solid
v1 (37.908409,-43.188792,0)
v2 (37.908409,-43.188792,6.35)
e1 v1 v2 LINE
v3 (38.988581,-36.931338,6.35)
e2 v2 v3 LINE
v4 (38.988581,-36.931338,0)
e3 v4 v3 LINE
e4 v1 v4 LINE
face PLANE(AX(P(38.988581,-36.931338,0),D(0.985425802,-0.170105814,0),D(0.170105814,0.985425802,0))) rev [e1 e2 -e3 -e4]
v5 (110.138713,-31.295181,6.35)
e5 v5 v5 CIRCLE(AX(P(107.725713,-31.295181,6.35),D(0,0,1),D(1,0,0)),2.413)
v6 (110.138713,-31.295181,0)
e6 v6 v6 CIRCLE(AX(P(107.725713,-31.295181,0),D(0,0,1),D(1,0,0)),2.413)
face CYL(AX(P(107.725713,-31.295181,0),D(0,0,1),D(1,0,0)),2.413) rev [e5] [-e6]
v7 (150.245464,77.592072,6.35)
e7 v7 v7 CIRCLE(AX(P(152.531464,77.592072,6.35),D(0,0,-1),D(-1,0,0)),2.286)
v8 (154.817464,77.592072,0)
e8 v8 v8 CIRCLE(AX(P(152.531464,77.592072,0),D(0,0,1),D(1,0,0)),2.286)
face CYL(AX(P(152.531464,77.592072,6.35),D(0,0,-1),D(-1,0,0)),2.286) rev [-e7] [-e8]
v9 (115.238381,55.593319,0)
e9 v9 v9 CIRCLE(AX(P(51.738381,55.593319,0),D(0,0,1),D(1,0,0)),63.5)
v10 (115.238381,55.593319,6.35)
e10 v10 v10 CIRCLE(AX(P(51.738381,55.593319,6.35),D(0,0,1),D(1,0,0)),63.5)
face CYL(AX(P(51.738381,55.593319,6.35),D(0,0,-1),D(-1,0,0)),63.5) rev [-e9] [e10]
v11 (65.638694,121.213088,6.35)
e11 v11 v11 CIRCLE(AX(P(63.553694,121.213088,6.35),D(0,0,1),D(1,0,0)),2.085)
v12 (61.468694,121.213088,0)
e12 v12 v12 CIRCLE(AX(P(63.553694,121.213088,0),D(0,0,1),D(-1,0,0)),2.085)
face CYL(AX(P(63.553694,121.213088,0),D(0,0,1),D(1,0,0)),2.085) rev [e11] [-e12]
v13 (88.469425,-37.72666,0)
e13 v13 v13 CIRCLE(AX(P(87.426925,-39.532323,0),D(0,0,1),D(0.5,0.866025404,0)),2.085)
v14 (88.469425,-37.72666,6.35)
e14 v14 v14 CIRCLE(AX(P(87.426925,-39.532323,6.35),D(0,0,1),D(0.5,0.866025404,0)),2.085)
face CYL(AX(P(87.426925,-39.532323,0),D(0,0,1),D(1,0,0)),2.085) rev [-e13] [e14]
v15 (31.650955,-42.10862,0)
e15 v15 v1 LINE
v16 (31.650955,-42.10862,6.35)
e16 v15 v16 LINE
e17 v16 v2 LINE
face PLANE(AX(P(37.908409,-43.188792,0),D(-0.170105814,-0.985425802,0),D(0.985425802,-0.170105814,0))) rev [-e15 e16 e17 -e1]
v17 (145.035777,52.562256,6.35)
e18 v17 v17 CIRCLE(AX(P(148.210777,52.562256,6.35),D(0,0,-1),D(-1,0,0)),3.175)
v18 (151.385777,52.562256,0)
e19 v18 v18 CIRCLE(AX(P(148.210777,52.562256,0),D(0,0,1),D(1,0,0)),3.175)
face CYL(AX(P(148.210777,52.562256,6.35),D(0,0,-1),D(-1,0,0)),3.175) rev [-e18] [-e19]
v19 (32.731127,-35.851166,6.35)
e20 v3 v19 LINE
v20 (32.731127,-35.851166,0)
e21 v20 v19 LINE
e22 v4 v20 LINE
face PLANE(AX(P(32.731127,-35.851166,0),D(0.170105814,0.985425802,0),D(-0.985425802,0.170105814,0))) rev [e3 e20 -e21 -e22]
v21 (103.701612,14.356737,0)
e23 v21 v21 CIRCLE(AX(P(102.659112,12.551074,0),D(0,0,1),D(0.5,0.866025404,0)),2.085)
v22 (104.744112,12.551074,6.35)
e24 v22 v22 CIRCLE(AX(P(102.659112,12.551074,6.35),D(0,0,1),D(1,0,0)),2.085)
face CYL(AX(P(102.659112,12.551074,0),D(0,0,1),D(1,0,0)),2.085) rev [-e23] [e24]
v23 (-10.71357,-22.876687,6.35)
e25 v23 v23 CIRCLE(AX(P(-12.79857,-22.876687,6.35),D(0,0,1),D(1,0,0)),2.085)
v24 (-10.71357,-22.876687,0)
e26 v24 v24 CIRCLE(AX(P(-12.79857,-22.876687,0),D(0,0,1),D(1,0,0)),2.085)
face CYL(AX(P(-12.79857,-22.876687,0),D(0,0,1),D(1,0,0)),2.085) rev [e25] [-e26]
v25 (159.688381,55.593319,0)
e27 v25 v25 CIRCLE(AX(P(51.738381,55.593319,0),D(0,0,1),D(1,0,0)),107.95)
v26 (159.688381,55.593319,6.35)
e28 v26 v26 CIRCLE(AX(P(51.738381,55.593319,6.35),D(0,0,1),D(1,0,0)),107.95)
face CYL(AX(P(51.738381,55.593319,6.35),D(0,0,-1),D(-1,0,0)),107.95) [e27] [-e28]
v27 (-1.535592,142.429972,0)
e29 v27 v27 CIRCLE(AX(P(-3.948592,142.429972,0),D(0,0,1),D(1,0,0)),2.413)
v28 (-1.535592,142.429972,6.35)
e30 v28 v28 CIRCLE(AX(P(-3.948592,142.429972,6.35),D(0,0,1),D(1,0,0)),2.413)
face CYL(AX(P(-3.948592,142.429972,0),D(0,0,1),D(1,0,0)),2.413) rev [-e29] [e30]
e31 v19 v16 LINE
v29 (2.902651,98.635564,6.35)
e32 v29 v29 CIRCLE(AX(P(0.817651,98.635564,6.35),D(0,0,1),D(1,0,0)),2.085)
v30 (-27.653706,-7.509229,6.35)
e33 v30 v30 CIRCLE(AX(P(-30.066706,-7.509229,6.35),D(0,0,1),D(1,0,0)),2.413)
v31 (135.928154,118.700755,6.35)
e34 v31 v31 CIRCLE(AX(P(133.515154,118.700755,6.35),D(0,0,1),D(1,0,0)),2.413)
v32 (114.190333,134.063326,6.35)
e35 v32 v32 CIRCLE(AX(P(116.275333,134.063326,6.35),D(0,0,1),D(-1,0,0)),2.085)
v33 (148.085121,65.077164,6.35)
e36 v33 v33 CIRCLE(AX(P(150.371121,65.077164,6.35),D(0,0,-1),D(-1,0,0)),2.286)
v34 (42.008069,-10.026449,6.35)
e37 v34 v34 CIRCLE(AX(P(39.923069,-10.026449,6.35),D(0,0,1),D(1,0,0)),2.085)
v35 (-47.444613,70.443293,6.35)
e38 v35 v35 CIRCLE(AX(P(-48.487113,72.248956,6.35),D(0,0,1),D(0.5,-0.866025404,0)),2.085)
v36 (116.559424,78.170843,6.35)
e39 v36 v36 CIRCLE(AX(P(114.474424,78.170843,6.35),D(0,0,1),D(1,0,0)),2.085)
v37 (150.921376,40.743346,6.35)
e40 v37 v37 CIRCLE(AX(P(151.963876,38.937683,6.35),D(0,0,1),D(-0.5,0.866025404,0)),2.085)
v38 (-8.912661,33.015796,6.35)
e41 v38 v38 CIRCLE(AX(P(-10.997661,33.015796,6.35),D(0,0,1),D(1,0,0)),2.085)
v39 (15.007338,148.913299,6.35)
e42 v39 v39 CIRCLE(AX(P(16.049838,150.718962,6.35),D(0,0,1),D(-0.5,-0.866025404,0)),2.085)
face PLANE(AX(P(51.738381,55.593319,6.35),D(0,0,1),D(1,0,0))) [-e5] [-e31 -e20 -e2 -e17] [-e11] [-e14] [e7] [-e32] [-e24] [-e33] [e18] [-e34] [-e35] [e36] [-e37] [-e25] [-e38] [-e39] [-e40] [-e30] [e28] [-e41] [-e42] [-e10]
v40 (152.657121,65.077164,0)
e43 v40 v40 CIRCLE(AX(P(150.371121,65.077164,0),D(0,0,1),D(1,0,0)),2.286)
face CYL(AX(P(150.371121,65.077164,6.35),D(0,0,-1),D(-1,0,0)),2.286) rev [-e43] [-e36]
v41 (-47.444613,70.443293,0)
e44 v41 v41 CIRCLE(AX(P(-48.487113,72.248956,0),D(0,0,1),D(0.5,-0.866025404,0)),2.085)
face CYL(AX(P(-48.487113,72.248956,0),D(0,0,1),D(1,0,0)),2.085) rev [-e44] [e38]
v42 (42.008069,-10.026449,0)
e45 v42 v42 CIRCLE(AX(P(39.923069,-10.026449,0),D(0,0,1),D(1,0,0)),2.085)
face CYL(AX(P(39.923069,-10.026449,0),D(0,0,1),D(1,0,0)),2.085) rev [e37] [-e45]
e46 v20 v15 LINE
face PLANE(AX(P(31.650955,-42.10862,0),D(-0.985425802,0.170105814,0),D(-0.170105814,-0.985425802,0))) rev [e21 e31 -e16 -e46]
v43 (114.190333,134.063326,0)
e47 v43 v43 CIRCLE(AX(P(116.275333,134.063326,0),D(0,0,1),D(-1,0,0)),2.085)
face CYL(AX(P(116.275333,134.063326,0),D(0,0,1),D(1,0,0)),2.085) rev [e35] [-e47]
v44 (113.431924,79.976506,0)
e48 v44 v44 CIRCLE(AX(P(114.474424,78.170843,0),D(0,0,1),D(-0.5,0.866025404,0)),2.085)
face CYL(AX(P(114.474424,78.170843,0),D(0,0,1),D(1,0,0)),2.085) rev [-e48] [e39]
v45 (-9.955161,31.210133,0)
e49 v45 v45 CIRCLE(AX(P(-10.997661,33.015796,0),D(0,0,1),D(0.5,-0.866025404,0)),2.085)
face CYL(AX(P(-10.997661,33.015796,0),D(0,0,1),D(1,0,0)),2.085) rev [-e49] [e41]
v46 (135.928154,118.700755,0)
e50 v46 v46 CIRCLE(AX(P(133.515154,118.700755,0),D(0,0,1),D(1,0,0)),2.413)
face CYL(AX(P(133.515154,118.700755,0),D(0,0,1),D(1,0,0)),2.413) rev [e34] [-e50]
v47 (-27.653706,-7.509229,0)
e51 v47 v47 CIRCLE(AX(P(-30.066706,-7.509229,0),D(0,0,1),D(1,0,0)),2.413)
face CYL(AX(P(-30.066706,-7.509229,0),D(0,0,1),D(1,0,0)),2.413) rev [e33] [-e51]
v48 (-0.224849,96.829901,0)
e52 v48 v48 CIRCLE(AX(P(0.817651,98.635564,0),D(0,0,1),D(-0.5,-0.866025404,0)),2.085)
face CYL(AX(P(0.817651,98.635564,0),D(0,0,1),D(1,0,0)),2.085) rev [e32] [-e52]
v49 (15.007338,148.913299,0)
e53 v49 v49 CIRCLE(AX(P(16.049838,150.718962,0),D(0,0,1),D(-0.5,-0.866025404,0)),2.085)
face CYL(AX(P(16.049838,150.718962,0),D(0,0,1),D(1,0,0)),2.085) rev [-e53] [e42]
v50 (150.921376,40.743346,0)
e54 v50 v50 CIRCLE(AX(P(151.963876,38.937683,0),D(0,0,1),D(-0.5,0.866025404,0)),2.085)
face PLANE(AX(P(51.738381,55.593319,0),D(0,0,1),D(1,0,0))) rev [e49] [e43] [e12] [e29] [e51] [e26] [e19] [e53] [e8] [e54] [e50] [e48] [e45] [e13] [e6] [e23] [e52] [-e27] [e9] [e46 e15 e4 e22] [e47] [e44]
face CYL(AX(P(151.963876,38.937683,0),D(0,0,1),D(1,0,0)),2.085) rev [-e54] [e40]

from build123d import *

# Parameters (mm, degrees)
SKETCH1_R                 = 107.95
SKETCH1_R_2               = 63.5
BOSS_EXTRUDE1_DEPTH       = 6.35
SKETCH3_R                 = 2.085
CUT_EXTRUDE2_DEPTH        = 229.663768434
CIRPATTERN1_COUNT         = 6
SKETCH4_R                 = 2.085
CUT_EXTRUDE3_DEPTH        = 229.663768434
CIRPATTERN2_COUNT         = 6
SKETCH5_R                 = 2.413
CUT_EXTRUDE4_DEPTH        = 229.663768434
CUT_EXTRUDE7_DEPTH        = 229.663768434
CUT_EXTRUDE7_DEPTH_BACK   = 229.663768434
SKETCH9_R                 = 2.413
CUT_EXTRUDE8_DEPTH        = 229.663768434
CUT_EXTRUDE10_START       = -6.35
CUT_EXTRUDE10_OUTLINE_R   = 3.175
CUT_EXTRUDE10_OUTLINE_R_2 = 2.286
CUT_EXTRUDE10_DEPTH       = 6.35


# Read off the part's stored shape, not the designer's step: Cut-Extrude10
with BuildPart() as part:
    # Sketch1 → Boss-Extrude1 (new body)
    with BuildSketch(Plane.XY):
        with Locations((51.738381467, 55.593319394)):
            Circle(SKETCH1_R)
        with Locations((51.738381467, 55.593319394)):
            Circle(SKETCH1_R_2, mode=Mode.SUBTRACT)
    extrude(amount=BOSS_EXTRUDE1_DEPTH)

    # Sketch3 → Cut-Extrude2 (cut, through all)
    with BuildSketch(Plane.XY.offset(6.35)):
        with Locations((-12.798570104, -22.876686862)):
            Circle(SKETCH3_R)
    cut_extrude2 = extrude(amount=-CUT_EXTRUDE2_DEPTH, mode=Mode.SUBTRACT)

    # CirPattern1: Cut-Extrude2 ×6 about axis
    cirpattern1_axis = Axis((51.738381467, 55.593319394, 0), (0, 0, 1))
    for i in range(1, CIRPATTERN1_COUNT):
        add(cut_extrude2.rotate(cirpattern1_axis, i * 360 / CIRPATTERN1_COUNT), mode=Mode.SUBTRACT)

    # Sketch4 → Cut-Extrude3 (cut, symmetric)
    with BuildSketch(Plane.XY.offset(6.35)):
        with Locations((39.923069121, -10.026449115)):
            Circle(SKETCH4_R)
    cut_extrude3 = extrude(amount=CUT_EXTRUDE3_DEPTH, both=True, mode=Mode.SUBTRACT)

    # CirPattern2: Cut-Extrude3 ×6 about axis
    cirpattern2_axis = Axis((51.738381467, 55.593319394, 0), (0, 0, 1))
    for i in range(1, CIRPATTERN2_COUNT):
        add(cut_extrude3.rotate(cirpattern2_axis, i * 360 / CIRPATTERN2_COUNT), mode=Mode.SUBTRACT)

    # Sketch5 → Cut-Extrude4 (cut, through all)
    with BuildSketch(Plane.XY.offset(6.35)):
        with Locations((-30.066706461, -7.50922857)):
            Circle(SKETCH5_R)
        with Locations((107.725712792, -31.295181319)):
            Circle(SKETCH5_R)
    extrude(amount=-CUT_EXTRUDE4_DEPTH, mode=Mode.SUBTRACT)

    # Sketch8 → Cut-Extrude7 (cut, two sides: drawn at the far end of the back side and taken through both)
    with BuildSketch(Plane.XY.offset(6.35).offset(-CUT_EXTRUDE7_DEPTH_BACK)):
        Polygon((31.650955464, -42.108620026), (32.73112738, -35.85116618), (38.988581226, -36.931338096), (37.90840931, -43.188791942), align=None)
    extrude(amount=CUT_EXTRUDE7_DEPTH + CUT_EXTRUDE7_DEPTH_BACK, mode=Mode.SUBTRACT)

    # Sketch9 → Cut-Extrude8 (cut, through all)
    with BuildSketch(Plane.XY.offset(6.35)):
        with Locations((-3.948592074, 142.429971857)):
            Circle(SKETCH9_R)
        with Locations((133.51515401, 118.700755207)):
            Circle(SKETCH9_R)
    extrude(amount=-CUT_EXTRUDE8_DEPTH, mode=Mode.SUBTRACT)

    # Cut-Extrude10 outline → Cut-Extrude10 (cut)
    with BuildSketch(Plane(origin=(0, 0, 0), x_dir=(-1, 0, 0), z_dir=(0, 0, -1)).offset(CUT_EXTRUDE10_START)):
        with Locations((-148.210776777, 52.562256335)):
            Circle(CUT_EXTRUDE10_OUTLINE_R)
        with Locations((-152.531464441, 77.592071718)):
            Circle(CUT_EXTRUDE10_OUTLINE_R_2)
        with Locations((-150.371120609, 65.077164026)):
            Circle(CUT_EXTRUDE10_OUTLINE_R_2)
    extrude(amount=CUT_EXTRUDE10_DEPTH, mode=Mode.SUBTRACT)


solid = part.part
